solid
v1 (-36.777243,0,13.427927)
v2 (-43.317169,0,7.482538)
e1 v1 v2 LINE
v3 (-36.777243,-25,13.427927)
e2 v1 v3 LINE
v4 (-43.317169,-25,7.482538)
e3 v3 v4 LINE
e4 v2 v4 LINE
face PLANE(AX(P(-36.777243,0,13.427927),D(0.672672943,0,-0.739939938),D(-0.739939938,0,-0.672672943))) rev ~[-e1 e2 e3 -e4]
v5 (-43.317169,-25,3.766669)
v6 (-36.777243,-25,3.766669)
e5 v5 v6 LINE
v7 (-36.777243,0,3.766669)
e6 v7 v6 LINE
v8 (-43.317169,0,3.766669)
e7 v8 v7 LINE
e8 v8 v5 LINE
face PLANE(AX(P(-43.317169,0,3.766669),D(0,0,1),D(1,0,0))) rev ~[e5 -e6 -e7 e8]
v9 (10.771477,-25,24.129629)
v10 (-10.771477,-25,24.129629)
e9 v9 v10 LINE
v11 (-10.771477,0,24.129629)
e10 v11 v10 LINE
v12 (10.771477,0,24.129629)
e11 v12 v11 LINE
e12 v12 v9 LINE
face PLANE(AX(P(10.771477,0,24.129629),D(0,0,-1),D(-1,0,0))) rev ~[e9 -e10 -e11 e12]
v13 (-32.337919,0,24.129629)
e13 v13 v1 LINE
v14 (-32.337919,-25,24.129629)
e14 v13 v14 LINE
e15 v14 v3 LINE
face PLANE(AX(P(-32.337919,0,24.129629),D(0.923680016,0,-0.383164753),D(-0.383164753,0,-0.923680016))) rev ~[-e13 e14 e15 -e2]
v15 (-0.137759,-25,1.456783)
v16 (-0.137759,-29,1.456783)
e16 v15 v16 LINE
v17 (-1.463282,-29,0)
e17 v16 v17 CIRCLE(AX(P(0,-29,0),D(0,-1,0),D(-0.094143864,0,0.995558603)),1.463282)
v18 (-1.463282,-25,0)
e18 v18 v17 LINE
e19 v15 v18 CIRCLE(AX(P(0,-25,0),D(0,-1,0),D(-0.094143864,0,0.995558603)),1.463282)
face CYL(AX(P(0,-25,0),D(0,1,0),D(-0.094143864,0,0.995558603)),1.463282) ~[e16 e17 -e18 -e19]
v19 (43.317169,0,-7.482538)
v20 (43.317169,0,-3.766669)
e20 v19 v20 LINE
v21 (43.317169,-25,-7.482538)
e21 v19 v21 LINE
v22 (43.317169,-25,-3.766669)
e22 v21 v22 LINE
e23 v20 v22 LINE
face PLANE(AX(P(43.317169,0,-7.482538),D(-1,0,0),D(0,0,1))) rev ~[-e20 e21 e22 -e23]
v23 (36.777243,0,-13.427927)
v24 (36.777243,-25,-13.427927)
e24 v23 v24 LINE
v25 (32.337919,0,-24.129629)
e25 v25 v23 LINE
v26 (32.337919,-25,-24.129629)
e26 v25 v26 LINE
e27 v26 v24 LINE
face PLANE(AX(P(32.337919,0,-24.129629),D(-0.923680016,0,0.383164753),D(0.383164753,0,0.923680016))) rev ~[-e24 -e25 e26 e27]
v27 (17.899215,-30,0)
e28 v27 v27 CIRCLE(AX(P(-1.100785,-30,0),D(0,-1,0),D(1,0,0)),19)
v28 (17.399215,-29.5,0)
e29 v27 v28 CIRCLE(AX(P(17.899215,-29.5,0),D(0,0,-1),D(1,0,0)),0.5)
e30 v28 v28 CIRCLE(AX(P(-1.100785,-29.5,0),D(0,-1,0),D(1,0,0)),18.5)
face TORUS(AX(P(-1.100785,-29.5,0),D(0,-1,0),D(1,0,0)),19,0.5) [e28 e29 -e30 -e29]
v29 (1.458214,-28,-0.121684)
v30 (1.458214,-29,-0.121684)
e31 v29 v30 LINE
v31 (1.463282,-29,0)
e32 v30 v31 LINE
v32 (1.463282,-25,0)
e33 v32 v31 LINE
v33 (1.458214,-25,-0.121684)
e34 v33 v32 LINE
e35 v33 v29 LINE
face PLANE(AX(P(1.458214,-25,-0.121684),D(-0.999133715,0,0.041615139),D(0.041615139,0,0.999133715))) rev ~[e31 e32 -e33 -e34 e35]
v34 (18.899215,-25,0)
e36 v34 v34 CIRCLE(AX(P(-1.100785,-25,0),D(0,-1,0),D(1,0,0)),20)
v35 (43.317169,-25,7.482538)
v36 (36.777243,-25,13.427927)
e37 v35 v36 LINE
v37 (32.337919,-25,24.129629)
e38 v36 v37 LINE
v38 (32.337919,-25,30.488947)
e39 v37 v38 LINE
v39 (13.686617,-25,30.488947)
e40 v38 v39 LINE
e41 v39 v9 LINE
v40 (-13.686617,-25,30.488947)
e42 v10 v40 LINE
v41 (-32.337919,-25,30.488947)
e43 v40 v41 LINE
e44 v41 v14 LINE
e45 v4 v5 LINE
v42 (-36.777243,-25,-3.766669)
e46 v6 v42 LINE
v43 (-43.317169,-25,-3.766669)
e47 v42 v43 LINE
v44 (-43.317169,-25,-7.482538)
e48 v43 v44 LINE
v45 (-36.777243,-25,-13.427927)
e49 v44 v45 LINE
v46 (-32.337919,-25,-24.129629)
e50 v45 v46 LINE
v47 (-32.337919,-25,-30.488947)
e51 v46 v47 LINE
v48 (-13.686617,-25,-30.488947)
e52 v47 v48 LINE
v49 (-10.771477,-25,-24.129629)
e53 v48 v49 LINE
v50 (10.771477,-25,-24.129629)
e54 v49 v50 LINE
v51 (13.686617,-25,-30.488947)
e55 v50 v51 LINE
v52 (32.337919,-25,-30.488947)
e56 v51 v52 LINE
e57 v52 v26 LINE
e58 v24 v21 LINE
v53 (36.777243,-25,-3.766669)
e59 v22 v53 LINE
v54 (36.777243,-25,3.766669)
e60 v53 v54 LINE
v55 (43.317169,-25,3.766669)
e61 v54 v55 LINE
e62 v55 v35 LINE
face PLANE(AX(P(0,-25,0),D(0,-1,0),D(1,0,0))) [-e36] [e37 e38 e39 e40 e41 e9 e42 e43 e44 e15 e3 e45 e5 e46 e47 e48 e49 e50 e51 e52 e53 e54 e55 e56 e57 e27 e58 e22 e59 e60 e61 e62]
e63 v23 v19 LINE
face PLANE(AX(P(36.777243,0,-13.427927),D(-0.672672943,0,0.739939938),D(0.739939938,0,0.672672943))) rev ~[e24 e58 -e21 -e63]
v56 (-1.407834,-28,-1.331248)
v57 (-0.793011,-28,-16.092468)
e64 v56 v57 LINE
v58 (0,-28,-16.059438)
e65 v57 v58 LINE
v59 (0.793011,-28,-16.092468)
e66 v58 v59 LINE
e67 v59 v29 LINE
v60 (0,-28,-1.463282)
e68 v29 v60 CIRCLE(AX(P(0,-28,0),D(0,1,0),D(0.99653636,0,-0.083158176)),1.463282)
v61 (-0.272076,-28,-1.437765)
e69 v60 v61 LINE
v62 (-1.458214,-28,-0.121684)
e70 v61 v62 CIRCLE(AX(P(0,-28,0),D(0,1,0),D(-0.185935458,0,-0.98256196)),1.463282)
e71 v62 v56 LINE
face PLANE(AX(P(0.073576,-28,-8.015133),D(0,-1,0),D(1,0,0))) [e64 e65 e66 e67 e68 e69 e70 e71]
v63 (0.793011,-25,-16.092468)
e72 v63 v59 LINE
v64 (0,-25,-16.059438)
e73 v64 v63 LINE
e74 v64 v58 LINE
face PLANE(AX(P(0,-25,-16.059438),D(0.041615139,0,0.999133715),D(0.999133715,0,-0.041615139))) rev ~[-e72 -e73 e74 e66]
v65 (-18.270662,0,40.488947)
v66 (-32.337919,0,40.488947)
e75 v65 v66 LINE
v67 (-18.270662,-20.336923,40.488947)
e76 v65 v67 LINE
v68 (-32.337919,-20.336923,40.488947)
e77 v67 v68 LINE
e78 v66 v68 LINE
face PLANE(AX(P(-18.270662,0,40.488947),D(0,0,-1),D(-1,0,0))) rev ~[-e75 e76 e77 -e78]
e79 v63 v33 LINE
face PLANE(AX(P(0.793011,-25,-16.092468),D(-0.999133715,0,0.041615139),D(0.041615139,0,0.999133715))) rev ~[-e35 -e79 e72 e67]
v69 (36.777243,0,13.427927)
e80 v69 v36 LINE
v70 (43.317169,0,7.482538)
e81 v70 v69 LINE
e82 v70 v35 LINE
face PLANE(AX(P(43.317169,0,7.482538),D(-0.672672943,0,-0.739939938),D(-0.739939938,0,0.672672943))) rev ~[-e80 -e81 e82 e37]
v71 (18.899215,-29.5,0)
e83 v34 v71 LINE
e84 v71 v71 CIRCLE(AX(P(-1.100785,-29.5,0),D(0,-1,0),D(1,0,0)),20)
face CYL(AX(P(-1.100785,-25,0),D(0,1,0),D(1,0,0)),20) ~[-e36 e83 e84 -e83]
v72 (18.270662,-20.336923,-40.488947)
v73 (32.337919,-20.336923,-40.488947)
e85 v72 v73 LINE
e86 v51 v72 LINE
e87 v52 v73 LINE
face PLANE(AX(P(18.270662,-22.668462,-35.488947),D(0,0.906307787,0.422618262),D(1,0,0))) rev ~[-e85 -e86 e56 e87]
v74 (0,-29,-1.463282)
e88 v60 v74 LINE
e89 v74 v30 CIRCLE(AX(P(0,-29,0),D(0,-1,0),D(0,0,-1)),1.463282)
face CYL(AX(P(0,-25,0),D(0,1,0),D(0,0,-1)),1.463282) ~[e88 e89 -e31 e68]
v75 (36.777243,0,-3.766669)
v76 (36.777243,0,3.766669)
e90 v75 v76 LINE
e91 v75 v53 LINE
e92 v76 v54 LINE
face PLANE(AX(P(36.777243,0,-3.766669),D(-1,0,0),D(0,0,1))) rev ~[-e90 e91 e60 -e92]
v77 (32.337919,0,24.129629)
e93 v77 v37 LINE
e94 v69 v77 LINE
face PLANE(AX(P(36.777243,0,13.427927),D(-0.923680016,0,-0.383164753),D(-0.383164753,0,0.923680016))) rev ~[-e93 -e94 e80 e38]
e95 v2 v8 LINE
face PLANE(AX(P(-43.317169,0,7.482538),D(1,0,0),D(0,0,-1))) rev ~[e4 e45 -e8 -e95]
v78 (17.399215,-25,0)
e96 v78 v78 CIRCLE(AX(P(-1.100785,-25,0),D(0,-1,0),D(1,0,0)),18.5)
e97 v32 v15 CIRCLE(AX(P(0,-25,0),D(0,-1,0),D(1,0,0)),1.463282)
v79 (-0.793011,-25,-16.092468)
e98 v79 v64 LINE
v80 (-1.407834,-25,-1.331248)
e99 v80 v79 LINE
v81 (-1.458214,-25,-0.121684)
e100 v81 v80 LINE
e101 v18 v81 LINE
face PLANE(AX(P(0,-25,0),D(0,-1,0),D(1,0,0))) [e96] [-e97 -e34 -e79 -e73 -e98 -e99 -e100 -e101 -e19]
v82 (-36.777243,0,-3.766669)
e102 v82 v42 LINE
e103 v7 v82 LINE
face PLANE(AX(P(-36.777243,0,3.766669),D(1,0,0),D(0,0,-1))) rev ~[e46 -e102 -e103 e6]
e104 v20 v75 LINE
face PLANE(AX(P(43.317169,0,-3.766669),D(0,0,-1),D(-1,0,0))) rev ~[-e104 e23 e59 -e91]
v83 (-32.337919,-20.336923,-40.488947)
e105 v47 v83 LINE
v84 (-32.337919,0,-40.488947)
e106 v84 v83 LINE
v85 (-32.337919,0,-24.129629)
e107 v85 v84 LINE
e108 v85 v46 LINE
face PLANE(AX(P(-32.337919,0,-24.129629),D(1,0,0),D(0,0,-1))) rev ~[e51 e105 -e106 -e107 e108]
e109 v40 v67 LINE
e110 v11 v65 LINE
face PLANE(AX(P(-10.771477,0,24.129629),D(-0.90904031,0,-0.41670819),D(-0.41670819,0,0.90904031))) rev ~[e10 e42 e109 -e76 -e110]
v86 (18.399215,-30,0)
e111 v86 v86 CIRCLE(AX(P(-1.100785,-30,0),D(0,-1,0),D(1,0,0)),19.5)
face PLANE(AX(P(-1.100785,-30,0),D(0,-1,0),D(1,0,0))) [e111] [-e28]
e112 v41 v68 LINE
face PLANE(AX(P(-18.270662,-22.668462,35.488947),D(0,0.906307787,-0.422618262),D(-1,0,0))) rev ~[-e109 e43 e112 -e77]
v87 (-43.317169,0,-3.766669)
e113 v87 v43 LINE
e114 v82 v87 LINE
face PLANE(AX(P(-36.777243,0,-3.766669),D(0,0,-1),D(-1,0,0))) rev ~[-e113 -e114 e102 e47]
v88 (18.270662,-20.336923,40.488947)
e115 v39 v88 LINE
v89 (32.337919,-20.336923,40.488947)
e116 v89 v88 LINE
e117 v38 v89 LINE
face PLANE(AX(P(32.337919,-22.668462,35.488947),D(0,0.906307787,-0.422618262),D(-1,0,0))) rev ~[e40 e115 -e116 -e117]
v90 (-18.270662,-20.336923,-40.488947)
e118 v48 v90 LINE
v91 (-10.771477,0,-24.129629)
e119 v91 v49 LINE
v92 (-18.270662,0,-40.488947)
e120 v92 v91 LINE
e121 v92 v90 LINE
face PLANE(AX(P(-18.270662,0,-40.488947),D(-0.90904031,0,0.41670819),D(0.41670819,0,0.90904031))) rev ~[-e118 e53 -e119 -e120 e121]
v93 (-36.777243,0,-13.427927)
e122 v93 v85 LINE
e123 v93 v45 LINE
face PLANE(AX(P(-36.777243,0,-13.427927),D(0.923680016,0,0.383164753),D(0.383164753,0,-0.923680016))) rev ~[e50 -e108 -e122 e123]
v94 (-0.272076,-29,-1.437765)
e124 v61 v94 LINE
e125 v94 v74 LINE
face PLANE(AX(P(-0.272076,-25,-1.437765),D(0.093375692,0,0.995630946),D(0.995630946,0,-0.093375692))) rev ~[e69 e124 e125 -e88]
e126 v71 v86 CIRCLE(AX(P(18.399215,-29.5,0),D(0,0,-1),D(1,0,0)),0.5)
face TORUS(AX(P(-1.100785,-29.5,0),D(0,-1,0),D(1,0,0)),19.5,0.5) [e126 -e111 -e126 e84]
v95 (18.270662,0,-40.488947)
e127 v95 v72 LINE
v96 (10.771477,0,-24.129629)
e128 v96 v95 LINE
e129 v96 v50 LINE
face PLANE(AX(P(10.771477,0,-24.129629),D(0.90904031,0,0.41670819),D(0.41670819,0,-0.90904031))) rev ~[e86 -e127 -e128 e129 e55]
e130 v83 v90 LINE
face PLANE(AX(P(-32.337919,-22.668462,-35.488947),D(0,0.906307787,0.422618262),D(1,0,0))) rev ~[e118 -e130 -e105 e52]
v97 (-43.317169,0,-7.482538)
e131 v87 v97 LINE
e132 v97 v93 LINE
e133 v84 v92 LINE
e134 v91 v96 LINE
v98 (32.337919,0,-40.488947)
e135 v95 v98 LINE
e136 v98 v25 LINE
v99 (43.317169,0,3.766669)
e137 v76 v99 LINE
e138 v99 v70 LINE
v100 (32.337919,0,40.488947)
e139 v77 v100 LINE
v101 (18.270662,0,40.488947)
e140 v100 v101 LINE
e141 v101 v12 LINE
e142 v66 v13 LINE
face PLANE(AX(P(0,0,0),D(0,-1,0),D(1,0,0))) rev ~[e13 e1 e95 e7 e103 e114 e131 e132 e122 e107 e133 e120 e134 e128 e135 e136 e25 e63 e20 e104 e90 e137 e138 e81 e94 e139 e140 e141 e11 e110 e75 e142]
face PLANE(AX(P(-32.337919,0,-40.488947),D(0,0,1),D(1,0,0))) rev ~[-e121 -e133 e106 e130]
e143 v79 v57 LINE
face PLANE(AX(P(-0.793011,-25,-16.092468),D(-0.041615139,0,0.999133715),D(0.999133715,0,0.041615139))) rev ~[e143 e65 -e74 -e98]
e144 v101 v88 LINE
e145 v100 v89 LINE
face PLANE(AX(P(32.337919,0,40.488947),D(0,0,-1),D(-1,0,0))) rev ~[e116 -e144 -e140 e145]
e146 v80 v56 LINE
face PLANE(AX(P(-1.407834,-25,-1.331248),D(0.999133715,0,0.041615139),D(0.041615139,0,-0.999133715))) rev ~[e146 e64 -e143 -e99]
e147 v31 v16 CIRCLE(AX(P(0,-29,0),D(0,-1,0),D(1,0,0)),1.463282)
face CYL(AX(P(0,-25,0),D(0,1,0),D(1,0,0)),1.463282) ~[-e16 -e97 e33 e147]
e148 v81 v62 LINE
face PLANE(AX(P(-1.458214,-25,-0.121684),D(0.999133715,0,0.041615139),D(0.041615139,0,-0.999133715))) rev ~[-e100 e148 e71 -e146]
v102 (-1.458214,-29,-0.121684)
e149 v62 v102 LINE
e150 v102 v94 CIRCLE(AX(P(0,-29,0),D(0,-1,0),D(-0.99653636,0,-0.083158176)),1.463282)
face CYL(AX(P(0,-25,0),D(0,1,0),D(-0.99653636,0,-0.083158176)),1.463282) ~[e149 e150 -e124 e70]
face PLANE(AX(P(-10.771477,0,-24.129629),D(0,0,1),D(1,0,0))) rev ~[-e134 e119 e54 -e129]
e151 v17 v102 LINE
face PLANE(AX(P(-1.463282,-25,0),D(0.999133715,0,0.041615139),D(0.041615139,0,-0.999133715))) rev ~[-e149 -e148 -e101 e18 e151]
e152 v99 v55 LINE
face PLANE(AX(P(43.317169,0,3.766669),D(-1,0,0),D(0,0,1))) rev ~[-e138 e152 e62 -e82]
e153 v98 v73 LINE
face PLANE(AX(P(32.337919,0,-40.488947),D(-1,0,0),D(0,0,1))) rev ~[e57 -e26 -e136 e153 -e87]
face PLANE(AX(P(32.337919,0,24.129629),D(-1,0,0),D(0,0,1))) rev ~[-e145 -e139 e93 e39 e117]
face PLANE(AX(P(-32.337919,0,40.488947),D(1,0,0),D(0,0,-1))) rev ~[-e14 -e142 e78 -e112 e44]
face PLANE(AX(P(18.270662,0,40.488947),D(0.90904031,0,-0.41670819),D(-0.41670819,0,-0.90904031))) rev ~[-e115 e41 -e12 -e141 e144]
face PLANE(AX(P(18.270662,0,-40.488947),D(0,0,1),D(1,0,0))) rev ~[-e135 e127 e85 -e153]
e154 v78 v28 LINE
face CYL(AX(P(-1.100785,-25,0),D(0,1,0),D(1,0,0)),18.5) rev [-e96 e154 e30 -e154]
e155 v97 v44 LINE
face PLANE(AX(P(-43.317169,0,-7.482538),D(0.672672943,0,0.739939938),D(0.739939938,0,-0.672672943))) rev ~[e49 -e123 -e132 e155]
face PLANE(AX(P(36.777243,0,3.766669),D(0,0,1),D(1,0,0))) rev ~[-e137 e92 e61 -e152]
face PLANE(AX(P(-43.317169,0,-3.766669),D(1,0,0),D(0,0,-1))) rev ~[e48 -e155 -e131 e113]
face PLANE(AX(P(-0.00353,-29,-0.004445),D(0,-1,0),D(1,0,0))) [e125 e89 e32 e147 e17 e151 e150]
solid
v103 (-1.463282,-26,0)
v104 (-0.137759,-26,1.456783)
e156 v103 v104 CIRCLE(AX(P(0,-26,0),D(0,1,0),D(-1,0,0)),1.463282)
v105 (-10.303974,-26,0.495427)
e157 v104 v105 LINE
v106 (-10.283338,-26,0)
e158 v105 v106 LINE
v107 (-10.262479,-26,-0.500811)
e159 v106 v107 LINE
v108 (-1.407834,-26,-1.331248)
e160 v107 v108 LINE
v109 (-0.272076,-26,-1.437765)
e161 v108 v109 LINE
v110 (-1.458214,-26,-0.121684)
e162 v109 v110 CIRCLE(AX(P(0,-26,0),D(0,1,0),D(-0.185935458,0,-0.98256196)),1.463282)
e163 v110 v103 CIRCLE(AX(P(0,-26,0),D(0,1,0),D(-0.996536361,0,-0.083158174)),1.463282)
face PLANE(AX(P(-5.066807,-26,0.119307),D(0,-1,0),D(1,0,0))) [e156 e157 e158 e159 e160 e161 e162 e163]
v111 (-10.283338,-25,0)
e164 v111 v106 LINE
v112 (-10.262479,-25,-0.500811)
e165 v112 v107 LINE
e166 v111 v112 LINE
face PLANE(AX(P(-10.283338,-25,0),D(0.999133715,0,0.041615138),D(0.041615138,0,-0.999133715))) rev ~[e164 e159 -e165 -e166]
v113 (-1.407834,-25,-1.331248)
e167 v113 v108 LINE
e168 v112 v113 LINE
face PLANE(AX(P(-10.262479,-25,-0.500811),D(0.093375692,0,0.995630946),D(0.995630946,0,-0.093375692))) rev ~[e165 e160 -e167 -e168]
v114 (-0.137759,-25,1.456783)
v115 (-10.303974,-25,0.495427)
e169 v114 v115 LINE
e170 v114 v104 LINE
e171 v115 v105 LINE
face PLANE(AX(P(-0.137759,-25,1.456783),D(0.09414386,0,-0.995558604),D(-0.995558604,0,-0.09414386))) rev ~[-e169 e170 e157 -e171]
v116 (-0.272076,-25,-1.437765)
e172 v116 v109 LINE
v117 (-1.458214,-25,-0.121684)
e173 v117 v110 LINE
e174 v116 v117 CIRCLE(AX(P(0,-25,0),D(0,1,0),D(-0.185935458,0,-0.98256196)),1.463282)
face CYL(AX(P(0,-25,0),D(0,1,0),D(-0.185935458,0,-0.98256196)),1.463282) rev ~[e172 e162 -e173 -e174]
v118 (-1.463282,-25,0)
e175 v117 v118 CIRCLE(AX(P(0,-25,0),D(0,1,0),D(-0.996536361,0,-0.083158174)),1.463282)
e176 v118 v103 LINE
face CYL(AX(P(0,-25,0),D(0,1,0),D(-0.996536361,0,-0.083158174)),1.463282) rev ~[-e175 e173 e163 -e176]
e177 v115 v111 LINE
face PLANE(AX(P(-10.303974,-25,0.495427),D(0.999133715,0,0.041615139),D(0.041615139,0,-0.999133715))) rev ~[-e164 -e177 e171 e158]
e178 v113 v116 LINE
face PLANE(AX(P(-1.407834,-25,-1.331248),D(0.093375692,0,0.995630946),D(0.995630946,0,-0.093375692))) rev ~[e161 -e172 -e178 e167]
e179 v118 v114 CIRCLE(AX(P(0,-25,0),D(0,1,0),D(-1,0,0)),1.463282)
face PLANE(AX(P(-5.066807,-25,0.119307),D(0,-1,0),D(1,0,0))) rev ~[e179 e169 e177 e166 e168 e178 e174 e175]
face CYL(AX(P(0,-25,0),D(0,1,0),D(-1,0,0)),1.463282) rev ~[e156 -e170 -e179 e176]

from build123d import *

# Parameters (mm, degrees)
F1_DEPTH = 25
F2_SIZE2 = 4.6630765815
F2_SIZE  = 10
F3_R     = 20
F3_R_2   = 18.5
F4_DEPTH = 5
F5_R     = 0.5
F7_DEPTH = 3
F8_DEPTH = 4
F9_DEPTH = 1


with BuildPart() as f1:
    # F0 (on Front) → F1 (new body)
    with BuildSketch(Plane.XZ):
        Polygon((-10.7714766636, 24.1296291351), (-32.3379188776, 24.1296291351), (-32.3379188776, -24.1296291351), (-10.7714766636, -24.1296291351), (10.7714766636, -24.1296291351), (32.3379188776, -24.1296291351), (32.3379188776, 24.1296291351), (10.7714766636, 24.1296291351), align=None)
        Polygon((-10.7714766636, -24.1296291351), (-32.3379188776, -24.1296291351), (-32.3379188776, -40.4889471829), (-18.2706620544, -40.4889471829), align=None)
        Polygon((32.3379188776, -24.1296291351), (10.7714766636, -24.1296291351), (18.2706620544, -40.4889471829), (32.3379188776, -40.4889471829), align=None)
        Polygon((36.7772430182, 13.4279271588), (32.3379188776, 24.1296291351), (32.3379188776, -24.1296291351), (36.7772430182, -13.4279271588), (43.317168951, -7.4825375341), (43.317168951, -3.7666687276), (36.7772430182, -3.7666687276), (36.7772430182, 3.7666687276), (43.317168951, 3.7666687276), (43.317168951, 7.4825375341), align=None)
        Polygon((18.2706620544, 40.4889471829), (10.7714766636, 24.1296291351), (32.3379188776, 24.1296291351), (32.3379188776, 40.4889471829), align=None)
        Polygon((-32.3379188776, 40.4889471829), (-32.3379188776, 24.1296291351), (-10.7714766636, 24.1296291351), (-18.2706620544, 40.4889471829), align=None)
        Polygon((-32.3379188776, -24.1296291351), (-32.3379188776, 24.1296291351), (-36.7772430182, 13.4279271588), (-43.317168951, 7.4825375341), (-43.317168951, 3.7666687276), (-36.7772430182, 3.7666687276), (-36.7772430182, -3.7666687276), (-43.317168951, -3.7666687276), (-43.317168951, -7.4825375341), (-36.7772430182, -13.4279271588), align=None)
    extrude(amount=F1_DEPTH)

    # F2
    f2_edges = [f1.edges().sort_by_distance(p)[0] for p in [
        (-25.30429, -25, -40.488947),
        (25.30429, -25, -40.488947),
        (25.30429, -25, 40.488947),
        (-25.30429, -25, 40.488947),
    ]]
    f2_side = f1.faces().sort_by_distance((0, -25, 0))[0]
    chamfer(f2_edges, length=F2_SIZE, length2=F2_SIZE2, reference=f2_side)

    # F3 (on face) → F4 (join)
    with BuildSketch(Plane.XZ.offset(25)):
        with Locations((-1.1007853685, 0)):
            Circle(F3_R)
        with Locations((-1.1007853685, 0)):
            Circle(F3_R_2, mode=Mode.SUBTRACT)
    extrude(amount=F4_DEPTH)

    # F5
    f5_edges = [f1.edges().sort_by_distance(p)[0] for p in [
        (-21.100785, -30, 0),
        (-19.600785, -30, 0),
    ]]
    fillet(f5_edges, radius=F5_R)

    # F6 (on face) → F7 (join)
    with BuildSketch(Plane.XZ.offset(25)):
        with BuildLine():
            Line((0.7930111024, -16.0924680531), (1.4582137539, -0.1216838649))
            ThreePointArc((1.4582137539, -0.1216838649), (0.9907412633, -1.0768593521), (0, -1.4632820354))
            ThreePointArc((0, -1.4632820354), (-0.1366349733, -1.4568888767), (-0.2720760154, -1.4377652649))
            Line((-0.2720760154, -1.4377652649), (-1.407833944, -1.3312477008))
            Line((-1.407833944, -1.3312477008), (-0.7930111024, -16.0924680531))
            Line((-0.7930111024, -16.0924680531), (0, -16.0594381729))
            Line((0, -16.0594381729), (0.7930111024, -16.0924680531))
        make_face()
        with BuildLine():
            ThreePointArc((-0.2720760154, -1.4377652649), (-0.1366349733, -1.4568888767), (0, -1.4632820354))
            Line((0, -1.4632820354), (-0.2720760154, -1.4377652649))
        make_face()
        with BuildLine():
            ThreePointArc((-0.2720760154, -1.4377652649), (-1.0869651486, -0.9796433436), (-1.4582137539, -0.1216838649))
            Line((-1.4582137539, -0.1216838649), (-1.407833944, -1.3312477008))
            Line((-1.407833944, -1.3312477008), (-0.2720760154, -1.4377652649))
        make_face()
    extrude(amount=F7_DEPTH)

    # F6 (on face) → F8 (join)
    with BuildSketch(Plane.XZ.offset(25)):
        with BuildLine():
            Line((1.4582137539, -0.1216838649), (1.4632820354, 0))
            ThreePointArc((1.4632820354, 0), (0.9847877966, 1.0823064772), (-0.1377590249, 1.4567830195))
            ThreePointArc((-0.1377590249, 1.4567830195), (-1.0823064772, 0.9847877966), (-1.4632820354, 0))
            Line((-1.4632820354, 0), (-1.4582137539, -0.1216838649))
            ThreePointArc((-1.4582137539, -0.1216838649), (-1.0869651486, -0.9796433436), (-0.2720760154, -1.4377652649))
            Line((-0.2720760154, -1.4377652649), (0, -1.4632820354))
            ThreePointArc((0, -1.4632820354), (0.9907412633, -1.0768593521), (1.4582137539, -0.1216838649))
        make_face()
    extrude(amount=F8_DEPTH)


with BuildPart() as f9:
    # F6 (on face) → F9 (new body)
    with BuildSketch(Plane.XZ.offset(25)):
        with BuildLine():
            ThreePointArc((-1.4632820354, 0), (-1.0823064772, 0.9847877966), (-0.1377590249, 1.4567830195))
            Line((-0.1377590249, 1.4567830195), (-10.3039735789, 0.4954265713))
            Line((-10.3039735789, 0.4954265713), (-10.2833384576, 0))
            Line((-10.2833384576, 0), (-10.2624790743, -0.5008108565))
            Line((-10.2624790743, -0.5008108565), (-1.407833944, -1.3312477008))
            Line((-1.407833944, -1.3312477008), (-1.4582137539, -0.1216838649))
            ThreePointArc((-1.4582137539, -0.1216838649), (-1.4620144159, -0.0608946846), (-1.4632820354, 0))
        make_face()
        with BuildLine():
            ThreePointArc((-0.2720760154, -1.4377652649), (-1.0869651486, -0.9796433436), (-1.4582137539, -0.1216838649))
            Line((-1.4582137539, -0.1216838649), (-1.407833944, -1.3312477008))
            Line((-1.407833944, -1.3312477008), (-0.2720760154, -1.4377652649))
        make_face()
    extrude(amount=F9_DEPTH)


solid = Compound([f1.part, f9.part])
